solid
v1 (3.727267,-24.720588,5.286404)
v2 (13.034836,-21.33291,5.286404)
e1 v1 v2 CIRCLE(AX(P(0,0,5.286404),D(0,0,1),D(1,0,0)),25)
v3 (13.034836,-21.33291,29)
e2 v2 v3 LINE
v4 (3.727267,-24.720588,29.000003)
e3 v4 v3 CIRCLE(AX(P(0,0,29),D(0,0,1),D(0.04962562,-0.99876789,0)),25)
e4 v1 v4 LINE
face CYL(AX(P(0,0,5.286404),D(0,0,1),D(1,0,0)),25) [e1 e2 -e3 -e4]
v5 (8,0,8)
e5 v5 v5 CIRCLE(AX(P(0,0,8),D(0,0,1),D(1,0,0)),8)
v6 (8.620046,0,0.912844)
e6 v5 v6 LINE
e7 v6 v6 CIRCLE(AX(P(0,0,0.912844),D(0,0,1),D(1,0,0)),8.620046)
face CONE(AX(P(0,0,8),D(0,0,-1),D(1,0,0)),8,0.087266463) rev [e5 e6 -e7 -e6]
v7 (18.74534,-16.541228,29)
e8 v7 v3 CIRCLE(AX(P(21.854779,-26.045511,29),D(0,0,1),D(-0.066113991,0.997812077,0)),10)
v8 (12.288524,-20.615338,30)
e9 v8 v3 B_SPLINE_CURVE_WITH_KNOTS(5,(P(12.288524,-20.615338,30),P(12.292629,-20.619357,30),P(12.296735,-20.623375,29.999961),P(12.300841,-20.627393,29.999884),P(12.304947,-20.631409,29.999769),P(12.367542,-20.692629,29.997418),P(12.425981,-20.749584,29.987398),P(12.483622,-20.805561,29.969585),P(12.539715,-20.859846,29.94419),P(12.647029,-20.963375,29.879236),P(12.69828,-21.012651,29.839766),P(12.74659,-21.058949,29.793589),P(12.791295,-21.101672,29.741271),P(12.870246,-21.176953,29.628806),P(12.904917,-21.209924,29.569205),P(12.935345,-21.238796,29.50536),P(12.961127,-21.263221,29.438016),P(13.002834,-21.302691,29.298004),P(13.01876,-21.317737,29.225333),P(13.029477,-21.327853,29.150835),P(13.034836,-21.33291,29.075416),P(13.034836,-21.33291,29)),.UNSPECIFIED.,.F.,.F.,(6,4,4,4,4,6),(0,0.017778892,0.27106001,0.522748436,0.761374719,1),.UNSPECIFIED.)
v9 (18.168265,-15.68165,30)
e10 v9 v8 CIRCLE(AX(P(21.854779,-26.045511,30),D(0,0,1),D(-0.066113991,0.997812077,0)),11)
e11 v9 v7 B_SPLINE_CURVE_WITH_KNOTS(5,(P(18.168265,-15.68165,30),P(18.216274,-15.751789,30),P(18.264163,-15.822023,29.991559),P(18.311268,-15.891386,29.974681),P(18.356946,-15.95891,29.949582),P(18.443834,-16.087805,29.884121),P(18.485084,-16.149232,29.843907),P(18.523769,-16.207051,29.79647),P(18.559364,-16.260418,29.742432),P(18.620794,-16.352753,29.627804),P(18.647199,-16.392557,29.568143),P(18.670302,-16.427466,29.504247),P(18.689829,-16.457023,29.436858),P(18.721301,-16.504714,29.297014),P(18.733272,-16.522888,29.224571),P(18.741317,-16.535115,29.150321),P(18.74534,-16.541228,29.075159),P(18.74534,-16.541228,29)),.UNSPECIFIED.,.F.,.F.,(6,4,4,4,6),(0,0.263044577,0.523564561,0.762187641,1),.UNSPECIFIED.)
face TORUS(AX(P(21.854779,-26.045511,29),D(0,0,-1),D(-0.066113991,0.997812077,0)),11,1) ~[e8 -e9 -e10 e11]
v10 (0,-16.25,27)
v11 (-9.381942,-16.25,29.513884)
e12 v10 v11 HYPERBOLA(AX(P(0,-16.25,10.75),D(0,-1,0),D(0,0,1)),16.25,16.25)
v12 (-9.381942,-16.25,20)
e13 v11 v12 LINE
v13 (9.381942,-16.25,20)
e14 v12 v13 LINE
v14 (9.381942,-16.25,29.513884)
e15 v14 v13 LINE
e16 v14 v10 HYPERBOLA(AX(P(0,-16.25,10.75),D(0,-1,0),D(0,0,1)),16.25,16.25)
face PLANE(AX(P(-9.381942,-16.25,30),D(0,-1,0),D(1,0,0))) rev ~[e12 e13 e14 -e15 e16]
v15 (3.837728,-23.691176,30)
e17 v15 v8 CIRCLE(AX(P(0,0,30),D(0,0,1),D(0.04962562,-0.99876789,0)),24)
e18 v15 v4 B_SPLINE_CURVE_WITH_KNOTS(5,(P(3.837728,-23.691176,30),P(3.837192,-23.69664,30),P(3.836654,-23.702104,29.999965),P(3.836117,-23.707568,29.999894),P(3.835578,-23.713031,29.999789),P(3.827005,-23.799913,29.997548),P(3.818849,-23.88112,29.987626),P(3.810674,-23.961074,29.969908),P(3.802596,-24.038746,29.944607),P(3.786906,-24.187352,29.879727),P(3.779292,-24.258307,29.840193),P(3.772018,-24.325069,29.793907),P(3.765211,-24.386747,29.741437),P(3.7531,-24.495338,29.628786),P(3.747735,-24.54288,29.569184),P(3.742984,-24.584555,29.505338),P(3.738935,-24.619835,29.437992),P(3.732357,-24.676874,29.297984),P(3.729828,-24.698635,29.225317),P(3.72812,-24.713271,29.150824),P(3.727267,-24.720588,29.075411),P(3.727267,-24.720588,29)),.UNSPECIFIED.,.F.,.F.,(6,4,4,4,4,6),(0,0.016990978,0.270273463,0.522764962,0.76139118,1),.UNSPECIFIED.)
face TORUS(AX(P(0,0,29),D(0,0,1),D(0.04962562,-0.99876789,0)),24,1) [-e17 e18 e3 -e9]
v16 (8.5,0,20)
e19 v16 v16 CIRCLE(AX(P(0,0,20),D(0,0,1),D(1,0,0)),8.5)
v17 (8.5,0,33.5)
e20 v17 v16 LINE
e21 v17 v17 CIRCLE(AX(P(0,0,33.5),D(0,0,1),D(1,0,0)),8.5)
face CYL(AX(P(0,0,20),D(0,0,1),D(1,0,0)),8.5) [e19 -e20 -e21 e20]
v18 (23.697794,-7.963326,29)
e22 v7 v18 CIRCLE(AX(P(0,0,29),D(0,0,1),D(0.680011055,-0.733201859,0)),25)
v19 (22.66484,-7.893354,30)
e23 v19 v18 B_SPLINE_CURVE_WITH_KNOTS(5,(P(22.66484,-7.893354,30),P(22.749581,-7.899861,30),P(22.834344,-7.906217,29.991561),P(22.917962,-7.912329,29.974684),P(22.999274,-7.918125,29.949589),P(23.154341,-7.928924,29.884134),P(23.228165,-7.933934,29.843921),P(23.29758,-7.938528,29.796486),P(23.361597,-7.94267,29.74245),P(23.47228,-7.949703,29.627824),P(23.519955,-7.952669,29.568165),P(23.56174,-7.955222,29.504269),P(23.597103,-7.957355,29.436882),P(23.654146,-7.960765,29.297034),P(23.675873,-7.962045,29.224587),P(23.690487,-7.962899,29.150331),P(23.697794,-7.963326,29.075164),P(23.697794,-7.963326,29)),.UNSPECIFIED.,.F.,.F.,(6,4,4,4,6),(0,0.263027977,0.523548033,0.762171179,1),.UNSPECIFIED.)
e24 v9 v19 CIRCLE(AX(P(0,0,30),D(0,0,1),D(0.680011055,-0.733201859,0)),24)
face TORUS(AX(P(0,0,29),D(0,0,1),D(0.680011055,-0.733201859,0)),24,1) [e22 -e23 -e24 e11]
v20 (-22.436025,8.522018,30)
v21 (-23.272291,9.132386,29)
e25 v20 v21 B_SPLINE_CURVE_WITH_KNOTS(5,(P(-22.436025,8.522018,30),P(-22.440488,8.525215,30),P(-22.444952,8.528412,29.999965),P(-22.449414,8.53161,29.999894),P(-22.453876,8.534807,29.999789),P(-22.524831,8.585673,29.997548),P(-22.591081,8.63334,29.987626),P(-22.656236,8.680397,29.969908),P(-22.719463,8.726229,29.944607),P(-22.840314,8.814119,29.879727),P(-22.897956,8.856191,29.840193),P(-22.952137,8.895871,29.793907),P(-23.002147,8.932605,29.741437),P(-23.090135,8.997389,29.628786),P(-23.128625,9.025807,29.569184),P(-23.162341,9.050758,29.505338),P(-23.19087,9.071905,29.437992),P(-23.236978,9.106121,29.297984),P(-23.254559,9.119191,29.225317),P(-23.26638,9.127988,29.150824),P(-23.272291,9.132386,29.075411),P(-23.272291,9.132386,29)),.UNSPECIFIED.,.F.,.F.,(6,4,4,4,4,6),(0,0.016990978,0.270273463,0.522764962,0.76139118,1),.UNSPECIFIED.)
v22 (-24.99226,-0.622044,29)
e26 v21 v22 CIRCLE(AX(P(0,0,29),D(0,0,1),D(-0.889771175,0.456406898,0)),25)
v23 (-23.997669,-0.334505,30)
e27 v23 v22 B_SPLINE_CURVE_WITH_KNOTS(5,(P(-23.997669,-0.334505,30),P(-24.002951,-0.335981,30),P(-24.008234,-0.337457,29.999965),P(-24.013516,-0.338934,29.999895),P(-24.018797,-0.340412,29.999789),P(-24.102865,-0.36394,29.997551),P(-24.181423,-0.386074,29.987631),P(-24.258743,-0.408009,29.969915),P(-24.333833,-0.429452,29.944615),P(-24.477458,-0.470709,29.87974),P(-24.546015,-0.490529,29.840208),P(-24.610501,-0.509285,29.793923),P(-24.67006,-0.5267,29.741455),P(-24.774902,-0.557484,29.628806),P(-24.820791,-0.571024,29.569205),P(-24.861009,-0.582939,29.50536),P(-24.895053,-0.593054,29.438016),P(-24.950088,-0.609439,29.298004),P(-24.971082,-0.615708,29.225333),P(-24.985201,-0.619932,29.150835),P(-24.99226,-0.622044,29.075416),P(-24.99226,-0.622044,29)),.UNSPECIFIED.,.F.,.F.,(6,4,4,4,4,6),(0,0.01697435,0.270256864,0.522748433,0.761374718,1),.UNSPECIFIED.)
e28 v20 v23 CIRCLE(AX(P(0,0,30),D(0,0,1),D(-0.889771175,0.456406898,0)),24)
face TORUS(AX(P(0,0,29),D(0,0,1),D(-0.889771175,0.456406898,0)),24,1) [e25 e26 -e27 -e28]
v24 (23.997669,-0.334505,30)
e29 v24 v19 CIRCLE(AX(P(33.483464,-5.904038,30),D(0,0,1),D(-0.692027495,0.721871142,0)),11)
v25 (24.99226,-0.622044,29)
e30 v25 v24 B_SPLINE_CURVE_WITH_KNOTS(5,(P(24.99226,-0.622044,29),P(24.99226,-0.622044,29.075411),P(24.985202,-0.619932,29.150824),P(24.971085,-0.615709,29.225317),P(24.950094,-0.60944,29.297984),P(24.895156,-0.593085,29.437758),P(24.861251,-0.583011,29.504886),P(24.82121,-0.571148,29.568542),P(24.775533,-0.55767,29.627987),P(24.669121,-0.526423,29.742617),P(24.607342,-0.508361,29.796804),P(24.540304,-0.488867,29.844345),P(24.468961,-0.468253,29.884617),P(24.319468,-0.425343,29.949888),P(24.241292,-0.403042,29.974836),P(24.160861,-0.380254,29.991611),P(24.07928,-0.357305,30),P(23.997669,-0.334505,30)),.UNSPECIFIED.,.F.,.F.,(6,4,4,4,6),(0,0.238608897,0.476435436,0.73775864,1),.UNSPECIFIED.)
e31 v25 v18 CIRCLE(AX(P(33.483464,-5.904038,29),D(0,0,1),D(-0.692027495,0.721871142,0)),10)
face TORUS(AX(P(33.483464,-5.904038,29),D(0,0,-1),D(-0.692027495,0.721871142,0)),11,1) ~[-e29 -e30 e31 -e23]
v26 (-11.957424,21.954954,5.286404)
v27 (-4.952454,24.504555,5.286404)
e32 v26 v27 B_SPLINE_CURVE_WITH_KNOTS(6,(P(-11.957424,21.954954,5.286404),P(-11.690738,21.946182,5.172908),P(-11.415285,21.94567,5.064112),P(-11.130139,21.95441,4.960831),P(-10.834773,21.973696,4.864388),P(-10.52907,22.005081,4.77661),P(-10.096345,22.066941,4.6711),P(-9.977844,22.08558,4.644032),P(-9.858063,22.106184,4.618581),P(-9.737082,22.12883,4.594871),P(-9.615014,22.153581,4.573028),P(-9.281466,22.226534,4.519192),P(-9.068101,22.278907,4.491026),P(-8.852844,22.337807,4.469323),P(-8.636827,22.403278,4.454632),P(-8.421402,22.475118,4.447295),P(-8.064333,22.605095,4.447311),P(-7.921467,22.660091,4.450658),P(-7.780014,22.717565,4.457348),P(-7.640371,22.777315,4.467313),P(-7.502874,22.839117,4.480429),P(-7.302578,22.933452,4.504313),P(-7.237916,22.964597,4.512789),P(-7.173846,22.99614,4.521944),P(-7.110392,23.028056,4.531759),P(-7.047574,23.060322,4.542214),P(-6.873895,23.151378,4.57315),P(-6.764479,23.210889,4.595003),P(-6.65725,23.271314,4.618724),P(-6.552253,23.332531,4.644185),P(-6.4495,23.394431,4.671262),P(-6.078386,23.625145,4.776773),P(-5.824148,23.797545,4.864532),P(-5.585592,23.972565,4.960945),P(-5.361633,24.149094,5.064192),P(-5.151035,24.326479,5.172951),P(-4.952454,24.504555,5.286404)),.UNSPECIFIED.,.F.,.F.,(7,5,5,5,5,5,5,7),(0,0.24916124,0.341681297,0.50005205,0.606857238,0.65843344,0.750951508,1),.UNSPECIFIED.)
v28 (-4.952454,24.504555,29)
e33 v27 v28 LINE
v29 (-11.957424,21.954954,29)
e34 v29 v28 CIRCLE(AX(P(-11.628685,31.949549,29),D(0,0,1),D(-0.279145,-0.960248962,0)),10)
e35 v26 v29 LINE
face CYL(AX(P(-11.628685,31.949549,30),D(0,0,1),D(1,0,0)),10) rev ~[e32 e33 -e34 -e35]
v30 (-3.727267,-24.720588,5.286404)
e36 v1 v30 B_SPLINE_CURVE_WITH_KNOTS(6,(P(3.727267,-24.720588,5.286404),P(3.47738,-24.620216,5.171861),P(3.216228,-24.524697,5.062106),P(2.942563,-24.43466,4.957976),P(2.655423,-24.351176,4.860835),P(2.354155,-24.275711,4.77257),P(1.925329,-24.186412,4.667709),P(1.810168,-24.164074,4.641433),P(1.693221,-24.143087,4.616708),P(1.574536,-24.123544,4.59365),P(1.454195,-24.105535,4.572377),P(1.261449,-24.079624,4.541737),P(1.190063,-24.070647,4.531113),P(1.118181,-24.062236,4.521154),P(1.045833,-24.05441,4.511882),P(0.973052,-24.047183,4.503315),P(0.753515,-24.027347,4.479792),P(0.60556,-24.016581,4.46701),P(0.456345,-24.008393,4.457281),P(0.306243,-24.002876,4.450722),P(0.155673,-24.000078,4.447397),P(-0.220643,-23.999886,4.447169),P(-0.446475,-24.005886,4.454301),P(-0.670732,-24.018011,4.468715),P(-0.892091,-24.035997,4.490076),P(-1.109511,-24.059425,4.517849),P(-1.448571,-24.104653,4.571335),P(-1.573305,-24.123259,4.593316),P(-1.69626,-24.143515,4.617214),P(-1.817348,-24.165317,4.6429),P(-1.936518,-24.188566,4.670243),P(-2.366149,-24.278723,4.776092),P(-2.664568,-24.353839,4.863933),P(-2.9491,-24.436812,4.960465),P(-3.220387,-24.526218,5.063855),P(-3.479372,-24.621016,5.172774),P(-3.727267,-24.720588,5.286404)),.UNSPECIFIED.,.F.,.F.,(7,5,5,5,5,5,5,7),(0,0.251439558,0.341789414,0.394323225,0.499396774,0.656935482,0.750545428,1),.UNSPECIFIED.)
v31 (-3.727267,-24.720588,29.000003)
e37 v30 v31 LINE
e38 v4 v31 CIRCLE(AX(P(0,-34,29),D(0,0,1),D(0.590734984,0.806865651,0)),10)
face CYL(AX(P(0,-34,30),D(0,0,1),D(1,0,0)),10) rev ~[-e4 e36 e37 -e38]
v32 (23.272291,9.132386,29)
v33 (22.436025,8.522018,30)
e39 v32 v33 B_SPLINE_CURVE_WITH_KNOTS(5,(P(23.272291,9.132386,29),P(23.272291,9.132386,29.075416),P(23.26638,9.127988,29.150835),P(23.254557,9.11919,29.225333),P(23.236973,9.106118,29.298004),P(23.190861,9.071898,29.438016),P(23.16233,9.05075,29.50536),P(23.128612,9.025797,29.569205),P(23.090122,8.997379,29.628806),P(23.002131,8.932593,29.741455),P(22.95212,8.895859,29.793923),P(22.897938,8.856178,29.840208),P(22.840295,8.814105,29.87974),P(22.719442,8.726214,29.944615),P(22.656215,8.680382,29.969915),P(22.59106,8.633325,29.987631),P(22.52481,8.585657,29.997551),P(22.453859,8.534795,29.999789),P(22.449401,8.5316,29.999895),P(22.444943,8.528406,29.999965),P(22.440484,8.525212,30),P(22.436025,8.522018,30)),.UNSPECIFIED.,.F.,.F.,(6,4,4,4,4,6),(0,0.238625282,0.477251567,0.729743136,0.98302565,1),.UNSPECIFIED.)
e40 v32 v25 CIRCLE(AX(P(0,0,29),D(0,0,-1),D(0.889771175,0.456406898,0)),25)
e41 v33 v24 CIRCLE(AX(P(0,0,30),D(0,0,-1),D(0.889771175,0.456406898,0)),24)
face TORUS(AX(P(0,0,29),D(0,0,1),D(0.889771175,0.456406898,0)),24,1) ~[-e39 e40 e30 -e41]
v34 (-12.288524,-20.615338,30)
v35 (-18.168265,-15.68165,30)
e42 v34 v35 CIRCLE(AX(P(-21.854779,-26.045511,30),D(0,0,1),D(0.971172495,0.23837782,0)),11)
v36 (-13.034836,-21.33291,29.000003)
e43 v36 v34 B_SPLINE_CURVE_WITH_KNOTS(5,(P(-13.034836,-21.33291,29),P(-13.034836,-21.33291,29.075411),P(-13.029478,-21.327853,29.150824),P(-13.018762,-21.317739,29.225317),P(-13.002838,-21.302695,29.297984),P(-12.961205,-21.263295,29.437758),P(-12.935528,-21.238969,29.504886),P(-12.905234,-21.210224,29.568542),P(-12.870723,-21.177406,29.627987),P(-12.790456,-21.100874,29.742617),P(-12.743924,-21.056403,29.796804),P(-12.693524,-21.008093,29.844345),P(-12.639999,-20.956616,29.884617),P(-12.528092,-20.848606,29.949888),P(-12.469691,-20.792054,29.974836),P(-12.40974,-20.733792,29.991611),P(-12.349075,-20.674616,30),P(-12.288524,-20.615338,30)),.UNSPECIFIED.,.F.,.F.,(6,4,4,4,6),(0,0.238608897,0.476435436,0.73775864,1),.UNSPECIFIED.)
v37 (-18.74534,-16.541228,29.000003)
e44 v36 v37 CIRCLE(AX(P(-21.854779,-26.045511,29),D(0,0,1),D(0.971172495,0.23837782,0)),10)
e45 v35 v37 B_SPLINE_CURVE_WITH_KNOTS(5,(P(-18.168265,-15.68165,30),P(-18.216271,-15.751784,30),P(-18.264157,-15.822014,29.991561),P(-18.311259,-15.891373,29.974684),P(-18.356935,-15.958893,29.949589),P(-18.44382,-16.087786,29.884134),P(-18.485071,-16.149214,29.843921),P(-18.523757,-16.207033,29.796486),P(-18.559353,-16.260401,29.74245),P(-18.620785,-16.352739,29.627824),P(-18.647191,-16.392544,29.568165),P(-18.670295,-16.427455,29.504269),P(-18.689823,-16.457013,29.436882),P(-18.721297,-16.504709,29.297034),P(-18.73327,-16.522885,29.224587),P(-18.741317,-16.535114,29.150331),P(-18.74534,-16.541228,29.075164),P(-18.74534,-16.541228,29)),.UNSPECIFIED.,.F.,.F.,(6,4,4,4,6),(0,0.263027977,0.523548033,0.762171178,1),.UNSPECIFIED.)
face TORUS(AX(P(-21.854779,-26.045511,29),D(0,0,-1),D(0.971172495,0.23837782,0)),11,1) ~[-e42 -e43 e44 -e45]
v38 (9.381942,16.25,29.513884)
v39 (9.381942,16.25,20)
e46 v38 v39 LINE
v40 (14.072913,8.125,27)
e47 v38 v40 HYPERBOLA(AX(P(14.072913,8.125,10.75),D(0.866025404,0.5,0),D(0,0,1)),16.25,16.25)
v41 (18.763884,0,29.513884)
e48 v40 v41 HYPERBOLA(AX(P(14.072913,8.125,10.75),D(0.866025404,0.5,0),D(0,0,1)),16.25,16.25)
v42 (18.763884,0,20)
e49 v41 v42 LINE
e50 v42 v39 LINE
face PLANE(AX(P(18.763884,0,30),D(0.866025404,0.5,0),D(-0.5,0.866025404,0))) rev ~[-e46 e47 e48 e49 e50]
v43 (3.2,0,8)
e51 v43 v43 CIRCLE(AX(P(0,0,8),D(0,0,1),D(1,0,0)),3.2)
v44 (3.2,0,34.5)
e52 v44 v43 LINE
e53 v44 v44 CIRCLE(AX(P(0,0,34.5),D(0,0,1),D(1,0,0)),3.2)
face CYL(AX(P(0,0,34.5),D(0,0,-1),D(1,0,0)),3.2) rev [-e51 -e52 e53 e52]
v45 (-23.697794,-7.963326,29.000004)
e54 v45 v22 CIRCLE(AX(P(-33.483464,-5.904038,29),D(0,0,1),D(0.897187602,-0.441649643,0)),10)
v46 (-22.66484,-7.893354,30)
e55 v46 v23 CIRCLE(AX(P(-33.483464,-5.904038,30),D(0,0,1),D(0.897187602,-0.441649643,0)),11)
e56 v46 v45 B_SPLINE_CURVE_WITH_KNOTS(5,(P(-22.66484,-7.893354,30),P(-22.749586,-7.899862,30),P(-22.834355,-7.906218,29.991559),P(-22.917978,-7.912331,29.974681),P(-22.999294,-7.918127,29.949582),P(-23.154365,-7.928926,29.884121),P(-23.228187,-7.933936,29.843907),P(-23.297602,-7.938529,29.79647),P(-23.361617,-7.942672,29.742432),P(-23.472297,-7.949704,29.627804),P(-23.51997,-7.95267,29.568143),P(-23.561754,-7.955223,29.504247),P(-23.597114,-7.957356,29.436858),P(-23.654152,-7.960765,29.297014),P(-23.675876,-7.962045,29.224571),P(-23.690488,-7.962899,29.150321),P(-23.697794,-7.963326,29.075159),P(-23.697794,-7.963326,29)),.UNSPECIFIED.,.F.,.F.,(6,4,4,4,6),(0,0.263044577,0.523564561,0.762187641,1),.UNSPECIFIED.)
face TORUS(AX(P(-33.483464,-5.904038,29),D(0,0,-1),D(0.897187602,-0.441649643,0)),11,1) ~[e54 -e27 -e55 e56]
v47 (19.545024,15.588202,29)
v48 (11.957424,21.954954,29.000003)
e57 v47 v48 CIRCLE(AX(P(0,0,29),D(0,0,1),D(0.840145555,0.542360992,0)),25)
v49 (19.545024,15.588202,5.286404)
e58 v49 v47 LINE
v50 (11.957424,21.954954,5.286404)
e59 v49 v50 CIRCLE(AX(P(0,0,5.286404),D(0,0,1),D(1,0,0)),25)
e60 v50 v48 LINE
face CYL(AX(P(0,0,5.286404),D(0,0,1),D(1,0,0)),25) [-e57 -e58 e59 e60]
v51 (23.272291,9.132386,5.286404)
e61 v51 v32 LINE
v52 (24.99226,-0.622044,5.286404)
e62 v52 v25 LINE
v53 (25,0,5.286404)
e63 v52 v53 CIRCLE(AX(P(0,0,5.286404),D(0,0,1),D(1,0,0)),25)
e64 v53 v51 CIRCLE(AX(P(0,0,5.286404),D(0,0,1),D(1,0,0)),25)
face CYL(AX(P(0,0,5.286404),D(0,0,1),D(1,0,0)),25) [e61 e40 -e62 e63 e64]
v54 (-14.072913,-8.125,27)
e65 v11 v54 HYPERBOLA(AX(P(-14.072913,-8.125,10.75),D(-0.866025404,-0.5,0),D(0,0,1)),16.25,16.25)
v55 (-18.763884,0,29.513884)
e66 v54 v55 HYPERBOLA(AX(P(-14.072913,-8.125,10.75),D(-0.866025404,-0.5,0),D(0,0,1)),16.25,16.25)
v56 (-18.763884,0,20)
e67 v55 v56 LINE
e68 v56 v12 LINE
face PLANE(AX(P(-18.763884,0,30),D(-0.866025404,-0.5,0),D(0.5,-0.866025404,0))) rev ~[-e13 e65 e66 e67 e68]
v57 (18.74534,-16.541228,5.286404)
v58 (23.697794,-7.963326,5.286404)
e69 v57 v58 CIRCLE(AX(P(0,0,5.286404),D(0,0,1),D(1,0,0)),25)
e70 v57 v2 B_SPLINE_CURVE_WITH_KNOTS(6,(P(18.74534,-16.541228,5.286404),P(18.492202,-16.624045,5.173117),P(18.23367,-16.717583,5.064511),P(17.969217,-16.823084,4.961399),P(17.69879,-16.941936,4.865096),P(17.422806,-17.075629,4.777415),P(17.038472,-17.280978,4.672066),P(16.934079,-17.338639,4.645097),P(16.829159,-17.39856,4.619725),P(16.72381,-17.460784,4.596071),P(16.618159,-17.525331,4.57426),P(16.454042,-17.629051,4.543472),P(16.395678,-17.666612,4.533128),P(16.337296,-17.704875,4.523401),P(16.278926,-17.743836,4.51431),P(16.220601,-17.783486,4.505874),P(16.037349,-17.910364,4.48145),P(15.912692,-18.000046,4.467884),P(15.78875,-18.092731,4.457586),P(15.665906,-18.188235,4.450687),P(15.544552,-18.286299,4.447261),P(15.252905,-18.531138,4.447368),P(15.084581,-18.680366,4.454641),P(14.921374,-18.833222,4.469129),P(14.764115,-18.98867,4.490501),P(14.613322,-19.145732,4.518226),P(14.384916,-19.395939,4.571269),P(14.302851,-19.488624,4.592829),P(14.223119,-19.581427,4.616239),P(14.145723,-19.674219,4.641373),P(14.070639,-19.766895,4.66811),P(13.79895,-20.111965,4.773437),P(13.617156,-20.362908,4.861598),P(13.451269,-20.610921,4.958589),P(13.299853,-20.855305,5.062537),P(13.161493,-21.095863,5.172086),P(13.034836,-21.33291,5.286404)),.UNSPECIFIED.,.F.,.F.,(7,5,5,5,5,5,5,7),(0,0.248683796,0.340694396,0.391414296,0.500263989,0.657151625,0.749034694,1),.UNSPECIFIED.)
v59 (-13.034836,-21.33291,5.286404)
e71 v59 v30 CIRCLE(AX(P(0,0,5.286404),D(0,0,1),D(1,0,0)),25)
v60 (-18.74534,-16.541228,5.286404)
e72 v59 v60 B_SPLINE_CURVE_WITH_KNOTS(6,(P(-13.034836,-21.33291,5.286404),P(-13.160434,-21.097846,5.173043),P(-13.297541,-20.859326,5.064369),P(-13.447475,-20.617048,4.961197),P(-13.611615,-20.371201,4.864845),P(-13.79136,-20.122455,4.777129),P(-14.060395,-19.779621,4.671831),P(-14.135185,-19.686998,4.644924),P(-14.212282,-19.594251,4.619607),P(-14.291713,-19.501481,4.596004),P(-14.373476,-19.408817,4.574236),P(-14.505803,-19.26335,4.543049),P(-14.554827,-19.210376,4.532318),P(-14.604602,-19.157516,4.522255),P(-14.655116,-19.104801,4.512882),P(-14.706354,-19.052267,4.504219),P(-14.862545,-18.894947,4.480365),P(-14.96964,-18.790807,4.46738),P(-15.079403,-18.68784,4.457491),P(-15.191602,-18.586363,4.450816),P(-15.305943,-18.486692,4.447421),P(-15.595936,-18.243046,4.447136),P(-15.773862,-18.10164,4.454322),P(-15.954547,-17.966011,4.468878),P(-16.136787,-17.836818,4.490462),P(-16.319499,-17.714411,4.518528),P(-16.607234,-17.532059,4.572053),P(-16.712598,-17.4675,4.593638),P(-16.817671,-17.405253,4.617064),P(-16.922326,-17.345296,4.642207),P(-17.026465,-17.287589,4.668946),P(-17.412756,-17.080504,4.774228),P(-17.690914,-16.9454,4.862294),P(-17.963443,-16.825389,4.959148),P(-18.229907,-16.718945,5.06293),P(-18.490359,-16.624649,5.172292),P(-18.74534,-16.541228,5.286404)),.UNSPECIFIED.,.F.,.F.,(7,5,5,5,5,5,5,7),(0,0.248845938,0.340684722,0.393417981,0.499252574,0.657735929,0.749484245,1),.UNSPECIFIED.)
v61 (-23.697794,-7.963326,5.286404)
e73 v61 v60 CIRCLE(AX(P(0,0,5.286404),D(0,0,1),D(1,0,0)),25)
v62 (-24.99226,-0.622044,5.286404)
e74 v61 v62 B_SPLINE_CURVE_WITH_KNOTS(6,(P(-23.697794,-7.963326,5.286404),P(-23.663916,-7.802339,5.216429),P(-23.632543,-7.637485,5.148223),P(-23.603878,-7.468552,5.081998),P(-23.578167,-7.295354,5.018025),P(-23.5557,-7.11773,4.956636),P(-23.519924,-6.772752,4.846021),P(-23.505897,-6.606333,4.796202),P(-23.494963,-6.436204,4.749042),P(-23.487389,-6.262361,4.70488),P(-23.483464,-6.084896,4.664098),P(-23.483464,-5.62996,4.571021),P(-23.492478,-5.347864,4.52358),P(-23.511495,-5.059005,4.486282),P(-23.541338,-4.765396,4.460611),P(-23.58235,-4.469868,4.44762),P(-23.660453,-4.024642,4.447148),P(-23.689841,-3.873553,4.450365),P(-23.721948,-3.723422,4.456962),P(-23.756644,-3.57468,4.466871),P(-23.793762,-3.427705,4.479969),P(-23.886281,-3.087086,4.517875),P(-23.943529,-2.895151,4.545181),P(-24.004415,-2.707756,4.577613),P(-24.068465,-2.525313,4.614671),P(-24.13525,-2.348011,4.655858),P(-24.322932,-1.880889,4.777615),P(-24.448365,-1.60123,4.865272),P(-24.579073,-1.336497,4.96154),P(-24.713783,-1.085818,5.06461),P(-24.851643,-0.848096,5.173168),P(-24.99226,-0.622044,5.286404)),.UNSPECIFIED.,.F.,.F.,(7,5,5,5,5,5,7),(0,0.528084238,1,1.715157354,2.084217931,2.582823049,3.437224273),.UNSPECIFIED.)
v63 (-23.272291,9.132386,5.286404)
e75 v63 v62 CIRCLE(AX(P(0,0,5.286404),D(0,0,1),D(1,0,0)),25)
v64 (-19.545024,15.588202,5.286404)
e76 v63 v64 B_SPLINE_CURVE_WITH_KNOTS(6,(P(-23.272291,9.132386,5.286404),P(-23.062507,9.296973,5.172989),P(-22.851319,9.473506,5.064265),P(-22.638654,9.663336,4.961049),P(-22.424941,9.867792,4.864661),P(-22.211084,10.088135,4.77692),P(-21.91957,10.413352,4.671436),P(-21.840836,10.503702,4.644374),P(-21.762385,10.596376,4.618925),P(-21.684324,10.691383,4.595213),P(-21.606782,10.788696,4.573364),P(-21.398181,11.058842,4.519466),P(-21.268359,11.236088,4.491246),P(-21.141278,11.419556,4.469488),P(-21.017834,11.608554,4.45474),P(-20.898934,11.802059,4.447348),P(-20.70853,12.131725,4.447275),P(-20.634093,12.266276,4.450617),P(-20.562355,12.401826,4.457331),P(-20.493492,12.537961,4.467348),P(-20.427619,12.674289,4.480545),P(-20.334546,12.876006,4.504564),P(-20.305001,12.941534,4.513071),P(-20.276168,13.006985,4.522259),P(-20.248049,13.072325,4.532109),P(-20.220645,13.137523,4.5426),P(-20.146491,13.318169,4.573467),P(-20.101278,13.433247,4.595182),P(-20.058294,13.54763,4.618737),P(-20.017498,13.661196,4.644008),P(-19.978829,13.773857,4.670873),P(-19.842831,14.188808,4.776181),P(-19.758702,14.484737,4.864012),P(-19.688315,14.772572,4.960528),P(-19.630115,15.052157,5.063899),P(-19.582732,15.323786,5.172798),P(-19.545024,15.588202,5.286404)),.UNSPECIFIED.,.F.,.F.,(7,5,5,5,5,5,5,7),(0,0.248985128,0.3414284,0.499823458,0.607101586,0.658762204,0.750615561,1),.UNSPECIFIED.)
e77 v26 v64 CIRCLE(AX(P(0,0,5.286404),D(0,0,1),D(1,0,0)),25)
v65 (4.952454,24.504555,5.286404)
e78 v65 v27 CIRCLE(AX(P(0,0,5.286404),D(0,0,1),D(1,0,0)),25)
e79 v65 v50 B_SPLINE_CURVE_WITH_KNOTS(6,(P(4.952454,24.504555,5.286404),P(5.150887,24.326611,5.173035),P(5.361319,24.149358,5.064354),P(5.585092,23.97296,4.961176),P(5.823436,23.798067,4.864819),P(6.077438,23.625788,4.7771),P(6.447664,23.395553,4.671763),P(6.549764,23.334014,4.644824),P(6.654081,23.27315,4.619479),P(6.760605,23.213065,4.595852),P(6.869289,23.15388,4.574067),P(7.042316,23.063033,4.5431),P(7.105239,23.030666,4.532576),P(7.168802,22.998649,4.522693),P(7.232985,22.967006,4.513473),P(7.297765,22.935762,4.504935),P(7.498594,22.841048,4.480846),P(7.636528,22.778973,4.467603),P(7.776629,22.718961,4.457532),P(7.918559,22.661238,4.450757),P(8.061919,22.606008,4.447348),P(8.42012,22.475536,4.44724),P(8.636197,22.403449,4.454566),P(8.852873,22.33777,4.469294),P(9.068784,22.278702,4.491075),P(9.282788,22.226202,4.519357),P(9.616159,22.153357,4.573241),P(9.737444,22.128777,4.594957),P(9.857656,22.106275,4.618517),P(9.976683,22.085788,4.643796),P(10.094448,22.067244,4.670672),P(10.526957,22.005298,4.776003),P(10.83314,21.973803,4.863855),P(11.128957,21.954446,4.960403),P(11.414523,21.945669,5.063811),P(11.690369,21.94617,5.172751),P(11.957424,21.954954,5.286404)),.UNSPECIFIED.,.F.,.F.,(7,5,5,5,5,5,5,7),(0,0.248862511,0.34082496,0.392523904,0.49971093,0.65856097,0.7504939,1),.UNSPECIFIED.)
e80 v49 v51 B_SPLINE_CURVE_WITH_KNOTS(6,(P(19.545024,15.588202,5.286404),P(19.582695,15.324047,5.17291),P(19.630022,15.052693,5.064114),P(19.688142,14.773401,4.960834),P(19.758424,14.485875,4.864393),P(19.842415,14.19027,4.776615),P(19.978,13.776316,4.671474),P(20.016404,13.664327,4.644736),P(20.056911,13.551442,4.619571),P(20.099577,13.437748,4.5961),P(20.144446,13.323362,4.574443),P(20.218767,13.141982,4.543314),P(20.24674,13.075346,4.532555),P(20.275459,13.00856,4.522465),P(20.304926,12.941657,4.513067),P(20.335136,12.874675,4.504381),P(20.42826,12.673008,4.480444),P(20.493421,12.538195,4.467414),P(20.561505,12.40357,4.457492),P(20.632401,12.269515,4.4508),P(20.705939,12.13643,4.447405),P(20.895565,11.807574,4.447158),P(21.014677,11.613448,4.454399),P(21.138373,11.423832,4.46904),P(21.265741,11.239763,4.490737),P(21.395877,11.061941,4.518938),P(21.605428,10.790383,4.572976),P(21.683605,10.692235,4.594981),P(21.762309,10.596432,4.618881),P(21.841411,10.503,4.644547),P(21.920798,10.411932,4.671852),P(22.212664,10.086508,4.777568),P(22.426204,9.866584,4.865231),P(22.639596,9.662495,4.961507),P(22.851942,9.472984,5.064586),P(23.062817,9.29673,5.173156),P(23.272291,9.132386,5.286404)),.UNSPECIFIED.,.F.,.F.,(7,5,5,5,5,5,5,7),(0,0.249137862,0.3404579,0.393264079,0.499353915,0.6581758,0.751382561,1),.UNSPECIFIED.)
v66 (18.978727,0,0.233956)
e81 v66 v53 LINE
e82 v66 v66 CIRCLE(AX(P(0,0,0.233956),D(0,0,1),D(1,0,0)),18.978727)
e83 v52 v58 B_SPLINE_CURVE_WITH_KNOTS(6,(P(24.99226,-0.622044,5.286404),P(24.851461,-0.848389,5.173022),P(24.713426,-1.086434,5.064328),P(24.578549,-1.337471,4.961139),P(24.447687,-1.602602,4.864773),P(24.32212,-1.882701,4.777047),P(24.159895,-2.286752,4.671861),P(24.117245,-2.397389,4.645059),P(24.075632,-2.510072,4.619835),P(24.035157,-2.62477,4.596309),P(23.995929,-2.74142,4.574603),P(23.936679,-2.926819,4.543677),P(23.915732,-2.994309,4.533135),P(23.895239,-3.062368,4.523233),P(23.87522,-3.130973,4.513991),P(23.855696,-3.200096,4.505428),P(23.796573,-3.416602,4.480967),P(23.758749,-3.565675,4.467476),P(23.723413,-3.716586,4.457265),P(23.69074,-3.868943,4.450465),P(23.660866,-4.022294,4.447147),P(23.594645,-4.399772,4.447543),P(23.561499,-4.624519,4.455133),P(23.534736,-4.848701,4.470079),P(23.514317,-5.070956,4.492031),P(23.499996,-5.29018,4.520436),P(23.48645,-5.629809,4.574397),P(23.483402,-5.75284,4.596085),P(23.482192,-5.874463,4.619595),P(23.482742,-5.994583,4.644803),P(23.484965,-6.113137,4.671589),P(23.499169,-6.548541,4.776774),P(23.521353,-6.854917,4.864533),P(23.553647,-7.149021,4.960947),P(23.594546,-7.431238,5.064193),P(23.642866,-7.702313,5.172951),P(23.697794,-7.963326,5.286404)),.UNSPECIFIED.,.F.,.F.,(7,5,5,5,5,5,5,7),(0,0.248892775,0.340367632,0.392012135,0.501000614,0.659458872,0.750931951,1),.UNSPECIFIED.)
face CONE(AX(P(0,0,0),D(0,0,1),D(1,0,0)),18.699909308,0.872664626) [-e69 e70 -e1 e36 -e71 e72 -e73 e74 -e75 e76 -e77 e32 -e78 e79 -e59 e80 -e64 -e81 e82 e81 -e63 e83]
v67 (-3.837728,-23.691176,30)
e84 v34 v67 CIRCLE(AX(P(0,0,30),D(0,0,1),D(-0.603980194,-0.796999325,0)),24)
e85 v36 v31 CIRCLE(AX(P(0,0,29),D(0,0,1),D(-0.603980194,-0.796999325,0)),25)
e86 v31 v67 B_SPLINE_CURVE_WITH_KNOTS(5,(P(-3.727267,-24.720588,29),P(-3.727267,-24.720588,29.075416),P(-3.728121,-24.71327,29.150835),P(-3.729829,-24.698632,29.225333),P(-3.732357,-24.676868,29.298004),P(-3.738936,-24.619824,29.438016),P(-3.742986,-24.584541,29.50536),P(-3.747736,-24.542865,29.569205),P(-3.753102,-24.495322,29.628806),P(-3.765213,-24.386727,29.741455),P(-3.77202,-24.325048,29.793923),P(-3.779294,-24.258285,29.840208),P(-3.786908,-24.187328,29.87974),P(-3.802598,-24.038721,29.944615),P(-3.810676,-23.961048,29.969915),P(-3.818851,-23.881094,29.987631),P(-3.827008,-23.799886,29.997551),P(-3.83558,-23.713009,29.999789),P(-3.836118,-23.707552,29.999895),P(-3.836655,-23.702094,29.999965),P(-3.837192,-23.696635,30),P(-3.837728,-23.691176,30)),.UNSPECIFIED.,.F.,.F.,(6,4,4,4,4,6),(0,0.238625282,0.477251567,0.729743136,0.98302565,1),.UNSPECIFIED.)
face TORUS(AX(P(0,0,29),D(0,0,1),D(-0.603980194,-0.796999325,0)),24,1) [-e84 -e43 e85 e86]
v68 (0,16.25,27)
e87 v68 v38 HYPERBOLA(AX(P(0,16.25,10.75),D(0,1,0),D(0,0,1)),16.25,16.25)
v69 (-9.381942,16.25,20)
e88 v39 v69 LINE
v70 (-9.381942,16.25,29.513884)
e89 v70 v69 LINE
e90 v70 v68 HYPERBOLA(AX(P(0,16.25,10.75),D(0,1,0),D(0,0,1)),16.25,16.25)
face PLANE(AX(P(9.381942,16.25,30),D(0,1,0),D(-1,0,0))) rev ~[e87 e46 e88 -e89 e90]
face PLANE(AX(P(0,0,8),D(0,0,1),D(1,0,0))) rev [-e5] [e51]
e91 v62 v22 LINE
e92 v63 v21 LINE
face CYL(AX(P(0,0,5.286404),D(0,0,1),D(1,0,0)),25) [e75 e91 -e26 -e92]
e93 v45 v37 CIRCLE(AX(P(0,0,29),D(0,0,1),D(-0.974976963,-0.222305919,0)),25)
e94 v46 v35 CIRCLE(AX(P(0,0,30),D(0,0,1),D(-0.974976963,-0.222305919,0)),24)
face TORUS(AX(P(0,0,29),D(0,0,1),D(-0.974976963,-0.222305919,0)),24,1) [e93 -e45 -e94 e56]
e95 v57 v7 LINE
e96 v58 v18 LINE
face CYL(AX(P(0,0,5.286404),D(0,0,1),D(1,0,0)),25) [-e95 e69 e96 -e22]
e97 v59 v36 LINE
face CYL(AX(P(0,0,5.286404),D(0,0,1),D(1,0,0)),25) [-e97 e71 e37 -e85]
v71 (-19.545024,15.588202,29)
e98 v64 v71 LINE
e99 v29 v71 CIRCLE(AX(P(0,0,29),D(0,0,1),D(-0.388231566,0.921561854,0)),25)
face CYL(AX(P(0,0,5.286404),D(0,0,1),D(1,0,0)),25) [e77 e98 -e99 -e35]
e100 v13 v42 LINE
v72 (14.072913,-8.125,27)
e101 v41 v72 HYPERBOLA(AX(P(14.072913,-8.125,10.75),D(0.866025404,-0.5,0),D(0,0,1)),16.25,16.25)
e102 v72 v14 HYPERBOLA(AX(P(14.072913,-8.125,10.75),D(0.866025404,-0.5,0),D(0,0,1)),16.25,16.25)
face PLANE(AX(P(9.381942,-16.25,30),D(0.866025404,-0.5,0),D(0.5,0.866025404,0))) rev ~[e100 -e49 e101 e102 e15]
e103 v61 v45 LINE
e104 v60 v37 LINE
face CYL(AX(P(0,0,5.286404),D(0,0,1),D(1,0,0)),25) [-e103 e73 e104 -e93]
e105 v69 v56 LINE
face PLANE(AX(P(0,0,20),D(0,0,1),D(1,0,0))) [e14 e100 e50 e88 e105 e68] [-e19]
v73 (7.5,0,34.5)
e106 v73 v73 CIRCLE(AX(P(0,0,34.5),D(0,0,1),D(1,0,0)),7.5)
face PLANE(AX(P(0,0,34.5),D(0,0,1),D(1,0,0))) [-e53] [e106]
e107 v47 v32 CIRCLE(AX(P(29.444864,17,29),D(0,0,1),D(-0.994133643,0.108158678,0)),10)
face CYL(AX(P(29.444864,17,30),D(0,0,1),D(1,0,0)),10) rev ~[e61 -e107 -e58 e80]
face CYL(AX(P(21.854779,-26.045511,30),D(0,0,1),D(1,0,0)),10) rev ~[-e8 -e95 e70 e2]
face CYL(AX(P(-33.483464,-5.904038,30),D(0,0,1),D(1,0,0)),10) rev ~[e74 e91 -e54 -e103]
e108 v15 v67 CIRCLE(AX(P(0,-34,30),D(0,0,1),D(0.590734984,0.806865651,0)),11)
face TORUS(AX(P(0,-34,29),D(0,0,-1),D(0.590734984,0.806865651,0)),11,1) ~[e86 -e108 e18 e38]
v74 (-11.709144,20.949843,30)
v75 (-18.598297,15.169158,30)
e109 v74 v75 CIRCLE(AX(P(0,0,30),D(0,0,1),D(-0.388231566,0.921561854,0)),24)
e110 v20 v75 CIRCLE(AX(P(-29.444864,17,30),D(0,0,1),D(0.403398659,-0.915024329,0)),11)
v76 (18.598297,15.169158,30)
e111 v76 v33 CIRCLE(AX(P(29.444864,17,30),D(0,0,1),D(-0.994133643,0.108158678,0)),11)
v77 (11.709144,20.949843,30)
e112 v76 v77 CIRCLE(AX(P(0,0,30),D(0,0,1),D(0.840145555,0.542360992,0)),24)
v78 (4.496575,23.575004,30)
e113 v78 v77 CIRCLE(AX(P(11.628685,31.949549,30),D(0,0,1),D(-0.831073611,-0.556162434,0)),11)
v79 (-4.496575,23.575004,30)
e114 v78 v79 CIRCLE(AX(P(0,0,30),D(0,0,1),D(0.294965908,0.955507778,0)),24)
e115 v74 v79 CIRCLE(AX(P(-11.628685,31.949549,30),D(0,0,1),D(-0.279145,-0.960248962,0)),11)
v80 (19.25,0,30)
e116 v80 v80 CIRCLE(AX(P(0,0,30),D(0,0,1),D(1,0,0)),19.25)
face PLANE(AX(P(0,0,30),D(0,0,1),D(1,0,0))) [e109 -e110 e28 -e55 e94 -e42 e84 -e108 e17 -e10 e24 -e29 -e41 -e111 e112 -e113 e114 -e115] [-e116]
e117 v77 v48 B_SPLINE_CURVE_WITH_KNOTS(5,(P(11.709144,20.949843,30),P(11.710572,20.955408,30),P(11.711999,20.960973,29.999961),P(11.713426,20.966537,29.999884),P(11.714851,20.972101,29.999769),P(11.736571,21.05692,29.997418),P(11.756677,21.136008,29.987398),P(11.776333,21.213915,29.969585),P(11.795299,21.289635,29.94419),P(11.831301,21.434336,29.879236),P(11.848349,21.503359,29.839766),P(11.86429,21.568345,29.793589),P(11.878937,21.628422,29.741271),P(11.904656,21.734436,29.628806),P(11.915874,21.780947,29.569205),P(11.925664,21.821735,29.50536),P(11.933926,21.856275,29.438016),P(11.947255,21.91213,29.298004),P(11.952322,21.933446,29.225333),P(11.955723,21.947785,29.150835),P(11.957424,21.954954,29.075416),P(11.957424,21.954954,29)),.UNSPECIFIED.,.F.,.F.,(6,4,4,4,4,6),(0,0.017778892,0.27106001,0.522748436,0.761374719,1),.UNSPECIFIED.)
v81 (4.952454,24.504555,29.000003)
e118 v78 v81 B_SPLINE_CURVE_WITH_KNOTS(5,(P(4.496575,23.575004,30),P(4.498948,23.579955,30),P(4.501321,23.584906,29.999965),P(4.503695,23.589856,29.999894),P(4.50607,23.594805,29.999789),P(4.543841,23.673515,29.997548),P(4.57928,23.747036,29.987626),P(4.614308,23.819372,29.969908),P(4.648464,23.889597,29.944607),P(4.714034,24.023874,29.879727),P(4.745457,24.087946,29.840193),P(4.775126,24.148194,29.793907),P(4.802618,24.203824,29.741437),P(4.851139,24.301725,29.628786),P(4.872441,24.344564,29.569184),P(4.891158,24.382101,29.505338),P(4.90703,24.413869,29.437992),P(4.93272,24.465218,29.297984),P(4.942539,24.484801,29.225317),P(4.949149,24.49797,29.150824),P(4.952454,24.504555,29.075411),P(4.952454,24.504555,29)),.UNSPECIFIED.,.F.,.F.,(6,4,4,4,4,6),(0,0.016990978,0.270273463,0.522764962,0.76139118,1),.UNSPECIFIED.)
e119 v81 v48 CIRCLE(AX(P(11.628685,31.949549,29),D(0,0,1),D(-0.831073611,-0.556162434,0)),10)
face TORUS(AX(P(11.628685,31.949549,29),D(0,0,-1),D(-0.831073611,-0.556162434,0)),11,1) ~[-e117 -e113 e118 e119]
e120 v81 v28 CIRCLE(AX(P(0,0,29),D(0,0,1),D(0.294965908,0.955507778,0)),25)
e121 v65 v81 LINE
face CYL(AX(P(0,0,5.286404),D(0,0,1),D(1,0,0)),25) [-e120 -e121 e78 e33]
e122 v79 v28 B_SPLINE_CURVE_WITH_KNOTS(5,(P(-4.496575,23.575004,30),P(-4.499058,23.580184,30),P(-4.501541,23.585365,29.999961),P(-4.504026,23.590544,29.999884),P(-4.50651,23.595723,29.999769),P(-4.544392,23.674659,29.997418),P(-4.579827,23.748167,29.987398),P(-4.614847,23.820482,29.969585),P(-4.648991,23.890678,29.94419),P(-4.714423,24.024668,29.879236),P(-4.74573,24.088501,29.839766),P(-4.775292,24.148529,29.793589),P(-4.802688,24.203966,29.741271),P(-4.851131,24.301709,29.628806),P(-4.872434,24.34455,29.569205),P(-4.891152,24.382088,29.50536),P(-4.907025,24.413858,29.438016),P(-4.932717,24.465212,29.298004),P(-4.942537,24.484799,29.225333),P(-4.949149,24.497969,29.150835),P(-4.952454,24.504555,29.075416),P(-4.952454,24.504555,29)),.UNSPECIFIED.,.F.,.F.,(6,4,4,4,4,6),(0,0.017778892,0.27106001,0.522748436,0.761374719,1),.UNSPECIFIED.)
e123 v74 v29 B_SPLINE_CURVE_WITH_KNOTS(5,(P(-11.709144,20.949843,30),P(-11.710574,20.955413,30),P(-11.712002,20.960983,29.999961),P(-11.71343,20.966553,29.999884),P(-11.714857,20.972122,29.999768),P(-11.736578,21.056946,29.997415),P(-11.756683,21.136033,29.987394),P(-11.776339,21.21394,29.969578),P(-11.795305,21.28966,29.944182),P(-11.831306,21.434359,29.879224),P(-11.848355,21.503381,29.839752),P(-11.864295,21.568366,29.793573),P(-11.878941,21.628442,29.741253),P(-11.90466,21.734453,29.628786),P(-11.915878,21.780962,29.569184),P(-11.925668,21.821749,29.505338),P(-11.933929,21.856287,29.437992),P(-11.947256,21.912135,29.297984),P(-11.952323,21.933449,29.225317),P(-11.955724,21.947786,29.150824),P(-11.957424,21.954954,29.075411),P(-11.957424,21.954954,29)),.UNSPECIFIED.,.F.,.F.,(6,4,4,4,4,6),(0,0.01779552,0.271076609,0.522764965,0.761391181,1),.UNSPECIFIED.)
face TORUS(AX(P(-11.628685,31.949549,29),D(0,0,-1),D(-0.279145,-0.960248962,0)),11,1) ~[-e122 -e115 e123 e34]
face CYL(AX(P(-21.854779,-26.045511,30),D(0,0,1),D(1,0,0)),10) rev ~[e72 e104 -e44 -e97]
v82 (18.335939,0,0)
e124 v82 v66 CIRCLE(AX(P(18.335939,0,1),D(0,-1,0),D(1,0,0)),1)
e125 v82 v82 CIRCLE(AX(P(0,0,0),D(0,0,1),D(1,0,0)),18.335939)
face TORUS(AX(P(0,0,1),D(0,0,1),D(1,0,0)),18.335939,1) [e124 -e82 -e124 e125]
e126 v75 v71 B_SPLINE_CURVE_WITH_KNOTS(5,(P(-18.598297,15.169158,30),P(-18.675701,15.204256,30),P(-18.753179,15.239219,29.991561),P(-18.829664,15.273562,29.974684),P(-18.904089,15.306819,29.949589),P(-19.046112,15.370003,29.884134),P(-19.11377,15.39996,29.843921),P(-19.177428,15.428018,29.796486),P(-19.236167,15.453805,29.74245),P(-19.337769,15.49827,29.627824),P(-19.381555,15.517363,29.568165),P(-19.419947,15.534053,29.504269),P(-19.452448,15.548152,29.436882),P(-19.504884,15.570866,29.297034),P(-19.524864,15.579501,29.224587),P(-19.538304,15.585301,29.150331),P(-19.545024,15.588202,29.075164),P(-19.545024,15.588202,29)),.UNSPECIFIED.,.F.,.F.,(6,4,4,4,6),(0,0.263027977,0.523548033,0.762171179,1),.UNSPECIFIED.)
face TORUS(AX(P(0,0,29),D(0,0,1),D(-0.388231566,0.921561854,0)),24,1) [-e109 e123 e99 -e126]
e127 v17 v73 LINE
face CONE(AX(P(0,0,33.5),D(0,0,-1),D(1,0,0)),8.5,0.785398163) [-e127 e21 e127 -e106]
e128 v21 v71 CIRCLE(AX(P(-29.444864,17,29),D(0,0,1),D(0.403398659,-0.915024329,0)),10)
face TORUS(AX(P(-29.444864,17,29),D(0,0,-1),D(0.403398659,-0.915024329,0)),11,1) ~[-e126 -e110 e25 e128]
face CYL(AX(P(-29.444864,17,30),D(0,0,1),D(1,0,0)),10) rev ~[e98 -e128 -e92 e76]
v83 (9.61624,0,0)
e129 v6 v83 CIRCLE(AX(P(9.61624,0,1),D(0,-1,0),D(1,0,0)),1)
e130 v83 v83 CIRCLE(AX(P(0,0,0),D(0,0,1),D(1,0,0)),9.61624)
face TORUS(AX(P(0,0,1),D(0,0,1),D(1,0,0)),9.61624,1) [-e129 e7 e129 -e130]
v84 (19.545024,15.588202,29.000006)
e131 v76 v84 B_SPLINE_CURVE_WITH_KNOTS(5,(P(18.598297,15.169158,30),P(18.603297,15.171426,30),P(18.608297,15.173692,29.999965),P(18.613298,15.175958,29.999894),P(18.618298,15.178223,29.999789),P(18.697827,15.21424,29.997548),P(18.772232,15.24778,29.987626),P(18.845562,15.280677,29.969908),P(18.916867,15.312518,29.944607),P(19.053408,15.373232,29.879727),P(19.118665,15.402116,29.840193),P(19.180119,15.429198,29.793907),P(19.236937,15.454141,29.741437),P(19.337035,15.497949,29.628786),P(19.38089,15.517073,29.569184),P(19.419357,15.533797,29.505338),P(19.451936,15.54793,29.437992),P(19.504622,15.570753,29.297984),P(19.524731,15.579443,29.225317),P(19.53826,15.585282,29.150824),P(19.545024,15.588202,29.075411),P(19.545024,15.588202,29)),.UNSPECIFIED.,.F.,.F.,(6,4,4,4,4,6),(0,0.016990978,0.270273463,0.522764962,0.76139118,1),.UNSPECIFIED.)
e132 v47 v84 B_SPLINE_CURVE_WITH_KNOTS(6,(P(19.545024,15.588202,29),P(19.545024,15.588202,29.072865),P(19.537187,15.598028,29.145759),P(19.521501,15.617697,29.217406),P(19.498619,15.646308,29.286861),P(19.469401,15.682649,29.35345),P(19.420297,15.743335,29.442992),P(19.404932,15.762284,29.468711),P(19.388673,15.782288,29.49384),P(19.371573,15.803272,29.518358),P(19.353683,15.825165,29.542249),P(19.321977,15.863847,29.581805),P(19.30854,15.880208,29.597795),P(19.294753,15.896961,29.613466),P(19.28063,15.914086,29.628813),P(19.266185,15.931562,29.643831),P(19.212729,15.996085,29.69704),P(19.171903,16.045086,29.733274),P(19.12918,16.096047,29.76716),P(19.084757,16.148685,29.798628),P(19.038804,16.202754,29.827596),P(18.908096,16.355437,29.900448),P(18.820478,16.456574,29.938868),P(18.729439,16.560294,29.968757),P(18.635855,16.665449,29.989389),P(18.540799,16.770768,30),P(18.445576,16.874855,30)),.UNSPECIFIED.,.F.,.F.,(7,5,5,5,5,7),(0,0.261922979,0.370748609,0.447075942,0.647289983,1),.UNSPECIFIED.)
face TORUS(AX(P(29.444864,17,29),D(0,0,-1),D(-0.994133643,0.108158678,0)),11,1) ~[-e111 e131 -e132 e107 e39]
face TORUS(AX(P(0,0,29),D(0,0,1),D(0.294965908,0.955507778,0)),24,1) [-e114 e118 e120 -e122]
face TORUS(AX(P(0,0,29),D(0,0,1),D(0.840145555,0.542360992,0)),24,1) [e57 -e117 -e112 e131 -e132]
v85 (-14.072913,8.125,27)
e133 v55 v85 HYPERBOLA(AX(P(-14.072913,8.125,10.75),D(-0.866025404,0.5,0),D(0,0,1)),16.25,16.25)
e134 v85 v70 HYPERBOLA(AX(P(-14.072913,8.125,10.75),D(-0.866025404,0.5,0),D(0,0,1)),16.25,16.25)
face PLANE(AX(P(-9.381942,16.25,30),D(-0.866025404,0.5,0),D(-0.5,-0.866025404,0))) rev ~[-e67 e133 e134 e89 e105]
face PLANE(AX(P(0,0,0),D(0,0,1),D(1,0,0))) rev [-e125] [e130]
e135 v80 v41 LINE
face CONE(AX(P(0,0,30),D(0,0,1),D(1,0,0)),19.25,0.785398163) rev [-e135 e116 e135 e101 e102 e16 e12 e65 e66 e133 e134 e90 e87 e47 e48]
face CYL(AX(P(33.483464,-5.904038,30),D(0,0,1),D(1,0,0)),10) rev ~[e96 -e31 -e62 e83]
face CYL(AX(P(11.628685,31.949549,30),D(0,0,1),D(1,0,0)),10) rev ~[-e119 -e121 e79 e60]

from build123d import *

# Parameters (mm, degrees)
F2_R         = 10
F3_DEPTH     = 30.001
F4_R         = 1
F5_T3_ANGLE  = 72.4183645551
F5_T6_ANGLE  = 34.3109861798
F5_T9_ANGLE  = 34.3109861798
F5_T12_ANGLE = 72.4183645551
F5_T15_ANGLE = 34.3109861798
F5_T18_ANGLE = 72.4183645551
F5_T21_ANGLE = 34.3109861799
F5_T24_ANGLE = 72.4183645551
F5_T27_ANGLE = 34.3109861798
F5_T30_ANGLE = 72.4183645551
F5_T33_ANGLE = 34.3109861799
F5_T36_ANGLE = 72.4183645551
F5_T39_ANGLE = 34.3109861799
F5_T42_ANGLE = 72.4183645551
F5_T45_ANGLE = 34.3109861799
F5_T48_ANGLE = 72.4183645551
F5_T51_ANGLE = 34.3109861798
F5_T54_ANGLE = 72.4183645551
F6_R         = 8.5
F7_DEPTH     = 10


# Not quite as in the source:
# - a fillet or chamfer that OpenCascade refuses, or shapes differently, is made with other operations: its cross-section is extruded or revolved along the edge and cut away or added


with BuildPart() as f1:
    # F0 (on Front) → F1 (revolve)
    with BuildSketch(Plane.XZ):
        Polygon((8, 8), (8.6999093082, 0), (18.6999093082, 0), (25, 5.2864037759), (25, 30), (19.25, 30), (16.25, 27), (16.25, 20), (8.5, 20), (8.5, 33.5), (7.5, 34.5), (3.2, 34.5), (3.2, 8), align=None)
    revolve(axis=Axis((0, 0, 15.2192509614), (0, 0, 1)))

    # F2 (on face) → F3 (cut, through all)
    with BuildSketch(Plane.XY.offset(30)):
        with Locations((11.6286848731, 31.9495491067)):
            Circle(F2_R)
        with Locations((-11.6286848731, 31.9495491067)):
            Circle(F2_R)
        with Locations((-29.4448637287, 17)):
            Circle(F2_R)
        with Locations((-33.4834636024, -5.9040380407)):
            Circle(F2_R)
        with Locations((-21.8547787293, -26.045511066)):
            Circle(F2_R)
        with Locations((0, -34)):
            Circle(F2_R)
        with Locations((21.8547787293, -26.045511066)):
            Circle(F2_R)
        with Locations((33.4834636024, -5.9040380407)):
            Circle(F2_R)
        with Locations((29.4448637287, 17)):
            Circle(F2_R)
    extrude(amount=-F3_DEPTH, mode=Mode.SUBTRACT)

    # F4
    f4_edges = [f1.edges().sort_by_distance(p)[0] for p in [
        (-8.699909, 0, 0),
        (-18.699909, 0, 0),
    ]]
    fillet(f4_edges, radius=F4_R)

    # F5: fillet of radius 1 on 18 edges, made by hand


with BuildPart() as f5_tool1:
    # F5_s2 → F5_t3 (revolve)
    with BuildSketch(Plane(origin=(4.7878159953, -19.5059893322, 0), x_dir=(0, 0, 1), z_dir=(0.2383778196, -0.971172495, 0))):
        with BuildLine():
            ThreePointArc((29, 17.4334321252), (29.7071067812, 17.1405389064), (30, 16.4334321252))
            Line((30, 16.4334321252), (30, 17.4334321252))
            Line((30, 17.4334321252), (29, 17.4334321252))
        make_face()
    revolve(axis=Axis((-21.8547787293, -26.045511066, 30), (0, 0, 1)), revolution_arc=F5_T3_ANGLE)


with BuildPart() as f5_tool4:
    # F5_s5 → F5_t6 (revolve)
    with BuildSketch(Plane(origin=(0, 0, 0), x_dir=(0, 0, 1), z_dir=(-0.7969993255, 0.6039801944, 0))):
        with BuildLine():
            ThreePointArc((29, -25), (29.7071067812, -24.7071067812), (30, -24))
            Line((30, -24), (30, -25))
            Line((30, -25), (29, -25))
        make_face()
    revolve(axis=Axis((0, 0, 30), (0, 0, 1)), revolution_arc=F5_T6_ANGLE)


with BuildPart() as f5_tool7:
    # F5_s8 → F5_t9 (revolve)
    with BuildSketch(Plane(origin=(0, 0, 0), x_dir=(0, 0, 1), z_dir=(-0.222305919, 0.974976963, 0))):
        with BuildLine():
            ThreePointArc((29, -25), (29.7071067812, -24.7071067812), (30, -24))
            Line((30, -24), (30, -25))
            Line((30, -25), (29, -25))
        make_face()
    revolve(axis=Axis((0, 0, 30), (0, 0, 1)), revolution_arc=F5_T9_ANGLE)


with BuildPart() as f5_tool10:
    # F5_s11 → F5_t12 (revolve)
    with BuildSketch(Plane(origin=(-8.8705284196, -18.0200035347, 0), x_dir=(0, 0, 1), z_dir=(-0.4416496426, -0.897187602, 0))):
        with BuildLine():
            ThreePointArc((29, 17.4334321252), (29.7071067812, 17.1405389064), (30, 16.4334321252))
            Line((30, 16.4334321252), (30, 17.4334321252))
            Line((30, 17.4334321252), (29, 17.4334321252))
        make_face()
    revolve(axis=Axis((-33.4834636024, -5.9040380407, 30), (0, 0, 1)), revolution_arc=F5_T12_ANGLE)


with BuildPart() as f5_tool13:
    # F5_s14 → F5_t15 (revolve)
    with BuildSketch(Plane(origin=(0, 0, 0), x_dir=(0, 0, 1), z_dir=(0.4564068976, 0.889771175, 0))):
        with BuildLine():
            ThreePointArc((29, -25), (29.7071067812, -24.7071067812), (30, -24))
            Line((30, -24), (30, -25))
            Line((30, -25), (29, -25))
        make_face()
    revolve(axis=Axis((0, 0, 30), (0, 0, 1)), revolution_arc=F5_T15_ANGLE)


with BuildPart() as f5_tool16:
    # F5_s17 → F5_t18 (revolve)
    with BuildSketch(Plane(origin=(-18.378254002, -8.1022578133, 0), x_dir=(0, 0, 1), z_dir=(-0.9150243287, -0.4033986588, 0))):
        with BuildLine():
            ThreePointArc((29, 17.4334321252), (29.7071067812, 17.1405389064), (30, 16.4334321252))
            Line((30, 16.4334321252), (30, 17.4334321252))
            Line((30, 17.4334321252), (29, 17.4334321252))
        make_face()
    revolve(axis=Axis((-29.4448637287, 17, 30), (0, 0, 1)), revolution_arc=F5_T18_ANGLE)


with BuildPart() as f5_tool19:
    # F5_s20 → F5_t21 (revolve)
    with BuildSketch(Plane(origin=(0, 0, 0), x_dir=(0, 0, 1), z_dir=(0.9215618544, 0.3882315655, 0))):
        with BuildLine():
            ThreePointArc((29, -25), (29.7071067812, -24.7071067812), (30, -24))
            Line((30, -24), (30, -25))
            Line((30, -25), (29, -25))
        make_face()
    revolve(axis=Axis((0, 0, 30), (0, 0, 1)), revolution_arc=F5_T21_ANGLE)


with BuildPart() as f5_tool22:
    # F5_s23 → F5_t24 (revolve)
    with BuildSketch(Plane(origin=(-19.2865902853, 5.6066243856, 0), x_dir=(0, 0, 1), z_dir=(-0.960248962, 0.2791450001, 0))):
        with BuildLine():
            ThreePointArc((29, 17.4334321252), (29.7071067812, 17.1405389064), (30, 16.4334321252))
            Line((30, 16.4334321252), (30, 17.4334321252))
            Line((30, 17.4334321252), (29, 17.4334321252))
        make_face()
    revolve(axis=Axis((-11.6286848731, 31.9495491067, 30), (0, 0, 1)), revolution_arc=F5_T24_ANGLE)


with BuildPart() as f5_tool25:
    # F5_s26 → F5_t27 (revolve)
    with BuildSketch(Plane(origin=(0, 0, 0), x_dir=(0, 0, 1), z_dir=(0.9555077776, -0.2949659082, 0))):
        with BuildLine():
            ThreePointArc((29, -25), (29.7071067812, -24.7071067812), (30, -24))
            Line((30, -24), (30, -25))
            Line((30, -25), (29, -25))
        make_face()
    revolve(axis=Axis((0, 0, 30), (0, 0, 1)), revolution_arc=F5_T27_ANGLE)


with BuildPart() as f5_tool28:
    # F5_s29 → F5_t30 (revolve)
    with BuildSketch(Plane(origin=(-11.1705166275, 16.6921047237, 0), x_dir=(0, 0, 1), z_dir=(-0.556162434, 0.8310736111, 0))):
        with BuildLine():
            ThreePointArc((29, 17.4334321252), (29.7071067812, 17.1405389064), (30, 16.4334321252))
            Line((30, 16.4334321252), (30, 17.4334321252))
            Line((30, 17.4334321252), (29, 17.4334321252))
        make_face()
    revolve(axis=Axis((11.6286848731, 31.9495491067, 30), (0, 0, 1)), revolution_arc=F5_T30_ANGLE)


with BuildPart() as f5_tool31:
    # F5_s32 → F5_t33 (revolve)
    with BuildSketch(Plane(origin=(0, 0, 0), x_dir=(0, 0, 1), z_dir=(0.5423609923, -0.8401455553, 0))):
        with BuildLine():
            ThreePointArc((29, -25), (29.7071067812, -24.7071067812), (30, -24))
            Line((30, -24), (30, -25))
            Line((30, -25), (29, -25))
        make_face()
    revolve(axis=Axis((0, 0, 30), (0, 0, 1)), revolution_arc=F5_T33_ANGLE)


with BuildPart() as f5_tool34:
    # F5_s35 → F5_t36 (revolve)
    with BuildSketch(Plane(origin=(2.1723659067, 19.9671637495, 0), x_dir=(0, 0, 1), z_dir=(0.1081586779, 0.9941336431, 0))):
        with BuildLine():
            ThreePointArc((29, 17.4334321252), (29.7071067812, 17.1405389064), (30, 16.4334321252))
            Line((30, 16.4334321252), (30, 17.4334321252))
            Line((30, 17.4334321252), (29, 17.4334321252))
        make_face()
    revolve(axis=Axis((29.4448637287, 17, 30), (0, 0, 1)), revolution_arc=F5_T36_ANGLE)


with BuildPart() as f5_tool37:
    # F5_s38 → F5_t39 (revolve)
    with BuildSketch(Plane(origin=(0, 0, 0), x_dir=(0, 0, 1), z_dir=(-0.4564068976, 0.889771175, 0))):
        with BuildLine():
            ThreePointArc((29, 25), (29.7071067812, 24.7071067812), (30, 24))
            Line((30, 24), (30, 25))
            Line((30, 25), (29, 25))
        make_face()
    revolve(axis=Axis((0, 0, 30), (0, 0, -1)), revolution_arc=F5_T39_ANGLE)


with BuildPart() as f5_tool40:
    # F5_s41 → F5_t42 (revolve)
    with BuildSketch(Plane(origin=(14.49877429, 13.8993649467, 0), x_dir=(0, 0, 1), z_dir=(0.7218711424, 0.692027495, 0))):
        with BuildLine():
            ThreePointArc((29, 17.4334321252), (29.7071067812, 17.1405389064), (30, 16.4334321252))
            Line((30, 16.4334321252), (30, 17.4334321252))
            Line((30, 17.4334321252), (29, 17.4334321252))
        make_face()
    revolve(axis=Axis((33.4834636024, -5.9040380407, 30), (0, 0, 1)), revolution_arc=F5_T42_ANGLE)


with BuildPart() as f5_tool43:
    # F5_s44 → F5_t45 (revolve)
    with BuildSketch(Plane(origin=(0, 0, 0), x_dir=(0, 0, 1), z_dir=(-0.7332018585, -0.6800110548, 0))):
        with BuildLine():
            ThreePointArc((29, -25), (29.7071067812, -24.7071067812), (30, -24))
            Line((30, -24), (30, -25))
            Line((30, -25), (29, -25))
        make_face()
    revolve(axis=Axis((0, 0, 30), (0, 0, 1)), revolution_arc=F5_T45_ANGLE)


with BuildPart() as f5_tool46:
    # F5_s47 → F5_t48 (revolve)
    with BuildSketch(Plane(origin=(20.0410450471, 1.327898811, 0), x_dir=(0, 0, 1), z_dir=(0.9978120766, 0.0661139909, 0))):
        with BuildLine():
            ThreePointArc((29, 17.4334321252), (29.7071067812, 17.1405389064), (30, 16.4334321252))
            Line((30, 16.4334321252), (30, 17.4334321252))
            Line((30, 17.4334321252), (29, 17.4334321252))
        make_face()
    revolve(axis=Axis((21.8547787293, -26.045511066, 30), (0, 0, 1)), revolution_arc=F5_T48_ANGLE)


with BuildPart() as f5_tool49:
    # F5_s50 → F5_t51 (revolve)
    with BuildSketch(Plane(origin=(0, 0, 0), x_dir=(0, 0, 1), z_dir=(-0.9987678899, -0.0496256197, 0))):
        with BuildLine():
            ThreePointArc((29, -25), (29.7071067812, -24.7071067812), (30, -24))
            Line((30, -24), (30, -25))
            Line((30, -25), (29, -25))
        make_face()
    revolve(axis=Axis((0, 0, 30), (0, 0, 1)), revolution_arc=F5_T51_ANGLE)


with BuildPart() as f5_tool52:
    # F5_s53 → F5_t54 (revolve)
    with BuildSketch(Plane(origin=(16.2058880953, -11.8649059363, 0), x_dir=(0, 0, 1), z_dir=(0.8068656507, -0.5907349843, 0))):
        with BuildLine():
            ThreePointArc((29, 17.4334321252), (29.7071067812, 17.1405389064), (30, 16.4334321252))
            Line((30, 16.4334321252), (30, 17.4334321252))
            Line((30, 17.4334321252), (29, 17.4334321252))
        make_face()
    revolve(axis=Axis((0, -34, 30), (0, 0, 1)), revolution_arc=F5_T54_ANGLE)


with BuildPart() as f1_1:
    add(f1.part)

    # F5_t55: cut F5_tool1, F5_tool4, F5_tool7, F5_tool10, F5_tool13, F5_tool16, F5_tool19, F5_tool22, F5_tool25, F5_tool28, F5_tool31, F5_tool34, F5_tool37, F5_tool40, F5_tool43, F5_tool46, F5_tool49, F5_tool52
    add([f5_tool1.part, f5_tool4.part, f5_tool7.part, f5_tool10.part, f5_tool13.part, f5_tool16.part, f5_tool19.part, f5_tool22.part, f5_tool25.part, f5_tool28.part, f5_tool31.part, f5_tool34.part, f5_tool37.part, f5_tool40.part, f5_tool43.part, f5_tool46.part, f5_tool49.part, f5_tool52.part], mode=Mode.SUBTRACT)

    # F6 (on face) → F7 (cut, through all)
    with BuildSketch(Plane.XY.offset(30)):
        Polygon((9.3819418743, 16.25), (-9.3819418743, 16.25), (-18.7638837487, 0), (-9.3819418743, -16.25), (9.3819418743, -16.25), (18.7638837487, 0), align=None)
        Circle(F6_R, mode=Mode.SUBTRACT)
    extrude(amount=-F7_DEPTH, mode=Mode.SUBTRACT)


solid = f1_1.part
